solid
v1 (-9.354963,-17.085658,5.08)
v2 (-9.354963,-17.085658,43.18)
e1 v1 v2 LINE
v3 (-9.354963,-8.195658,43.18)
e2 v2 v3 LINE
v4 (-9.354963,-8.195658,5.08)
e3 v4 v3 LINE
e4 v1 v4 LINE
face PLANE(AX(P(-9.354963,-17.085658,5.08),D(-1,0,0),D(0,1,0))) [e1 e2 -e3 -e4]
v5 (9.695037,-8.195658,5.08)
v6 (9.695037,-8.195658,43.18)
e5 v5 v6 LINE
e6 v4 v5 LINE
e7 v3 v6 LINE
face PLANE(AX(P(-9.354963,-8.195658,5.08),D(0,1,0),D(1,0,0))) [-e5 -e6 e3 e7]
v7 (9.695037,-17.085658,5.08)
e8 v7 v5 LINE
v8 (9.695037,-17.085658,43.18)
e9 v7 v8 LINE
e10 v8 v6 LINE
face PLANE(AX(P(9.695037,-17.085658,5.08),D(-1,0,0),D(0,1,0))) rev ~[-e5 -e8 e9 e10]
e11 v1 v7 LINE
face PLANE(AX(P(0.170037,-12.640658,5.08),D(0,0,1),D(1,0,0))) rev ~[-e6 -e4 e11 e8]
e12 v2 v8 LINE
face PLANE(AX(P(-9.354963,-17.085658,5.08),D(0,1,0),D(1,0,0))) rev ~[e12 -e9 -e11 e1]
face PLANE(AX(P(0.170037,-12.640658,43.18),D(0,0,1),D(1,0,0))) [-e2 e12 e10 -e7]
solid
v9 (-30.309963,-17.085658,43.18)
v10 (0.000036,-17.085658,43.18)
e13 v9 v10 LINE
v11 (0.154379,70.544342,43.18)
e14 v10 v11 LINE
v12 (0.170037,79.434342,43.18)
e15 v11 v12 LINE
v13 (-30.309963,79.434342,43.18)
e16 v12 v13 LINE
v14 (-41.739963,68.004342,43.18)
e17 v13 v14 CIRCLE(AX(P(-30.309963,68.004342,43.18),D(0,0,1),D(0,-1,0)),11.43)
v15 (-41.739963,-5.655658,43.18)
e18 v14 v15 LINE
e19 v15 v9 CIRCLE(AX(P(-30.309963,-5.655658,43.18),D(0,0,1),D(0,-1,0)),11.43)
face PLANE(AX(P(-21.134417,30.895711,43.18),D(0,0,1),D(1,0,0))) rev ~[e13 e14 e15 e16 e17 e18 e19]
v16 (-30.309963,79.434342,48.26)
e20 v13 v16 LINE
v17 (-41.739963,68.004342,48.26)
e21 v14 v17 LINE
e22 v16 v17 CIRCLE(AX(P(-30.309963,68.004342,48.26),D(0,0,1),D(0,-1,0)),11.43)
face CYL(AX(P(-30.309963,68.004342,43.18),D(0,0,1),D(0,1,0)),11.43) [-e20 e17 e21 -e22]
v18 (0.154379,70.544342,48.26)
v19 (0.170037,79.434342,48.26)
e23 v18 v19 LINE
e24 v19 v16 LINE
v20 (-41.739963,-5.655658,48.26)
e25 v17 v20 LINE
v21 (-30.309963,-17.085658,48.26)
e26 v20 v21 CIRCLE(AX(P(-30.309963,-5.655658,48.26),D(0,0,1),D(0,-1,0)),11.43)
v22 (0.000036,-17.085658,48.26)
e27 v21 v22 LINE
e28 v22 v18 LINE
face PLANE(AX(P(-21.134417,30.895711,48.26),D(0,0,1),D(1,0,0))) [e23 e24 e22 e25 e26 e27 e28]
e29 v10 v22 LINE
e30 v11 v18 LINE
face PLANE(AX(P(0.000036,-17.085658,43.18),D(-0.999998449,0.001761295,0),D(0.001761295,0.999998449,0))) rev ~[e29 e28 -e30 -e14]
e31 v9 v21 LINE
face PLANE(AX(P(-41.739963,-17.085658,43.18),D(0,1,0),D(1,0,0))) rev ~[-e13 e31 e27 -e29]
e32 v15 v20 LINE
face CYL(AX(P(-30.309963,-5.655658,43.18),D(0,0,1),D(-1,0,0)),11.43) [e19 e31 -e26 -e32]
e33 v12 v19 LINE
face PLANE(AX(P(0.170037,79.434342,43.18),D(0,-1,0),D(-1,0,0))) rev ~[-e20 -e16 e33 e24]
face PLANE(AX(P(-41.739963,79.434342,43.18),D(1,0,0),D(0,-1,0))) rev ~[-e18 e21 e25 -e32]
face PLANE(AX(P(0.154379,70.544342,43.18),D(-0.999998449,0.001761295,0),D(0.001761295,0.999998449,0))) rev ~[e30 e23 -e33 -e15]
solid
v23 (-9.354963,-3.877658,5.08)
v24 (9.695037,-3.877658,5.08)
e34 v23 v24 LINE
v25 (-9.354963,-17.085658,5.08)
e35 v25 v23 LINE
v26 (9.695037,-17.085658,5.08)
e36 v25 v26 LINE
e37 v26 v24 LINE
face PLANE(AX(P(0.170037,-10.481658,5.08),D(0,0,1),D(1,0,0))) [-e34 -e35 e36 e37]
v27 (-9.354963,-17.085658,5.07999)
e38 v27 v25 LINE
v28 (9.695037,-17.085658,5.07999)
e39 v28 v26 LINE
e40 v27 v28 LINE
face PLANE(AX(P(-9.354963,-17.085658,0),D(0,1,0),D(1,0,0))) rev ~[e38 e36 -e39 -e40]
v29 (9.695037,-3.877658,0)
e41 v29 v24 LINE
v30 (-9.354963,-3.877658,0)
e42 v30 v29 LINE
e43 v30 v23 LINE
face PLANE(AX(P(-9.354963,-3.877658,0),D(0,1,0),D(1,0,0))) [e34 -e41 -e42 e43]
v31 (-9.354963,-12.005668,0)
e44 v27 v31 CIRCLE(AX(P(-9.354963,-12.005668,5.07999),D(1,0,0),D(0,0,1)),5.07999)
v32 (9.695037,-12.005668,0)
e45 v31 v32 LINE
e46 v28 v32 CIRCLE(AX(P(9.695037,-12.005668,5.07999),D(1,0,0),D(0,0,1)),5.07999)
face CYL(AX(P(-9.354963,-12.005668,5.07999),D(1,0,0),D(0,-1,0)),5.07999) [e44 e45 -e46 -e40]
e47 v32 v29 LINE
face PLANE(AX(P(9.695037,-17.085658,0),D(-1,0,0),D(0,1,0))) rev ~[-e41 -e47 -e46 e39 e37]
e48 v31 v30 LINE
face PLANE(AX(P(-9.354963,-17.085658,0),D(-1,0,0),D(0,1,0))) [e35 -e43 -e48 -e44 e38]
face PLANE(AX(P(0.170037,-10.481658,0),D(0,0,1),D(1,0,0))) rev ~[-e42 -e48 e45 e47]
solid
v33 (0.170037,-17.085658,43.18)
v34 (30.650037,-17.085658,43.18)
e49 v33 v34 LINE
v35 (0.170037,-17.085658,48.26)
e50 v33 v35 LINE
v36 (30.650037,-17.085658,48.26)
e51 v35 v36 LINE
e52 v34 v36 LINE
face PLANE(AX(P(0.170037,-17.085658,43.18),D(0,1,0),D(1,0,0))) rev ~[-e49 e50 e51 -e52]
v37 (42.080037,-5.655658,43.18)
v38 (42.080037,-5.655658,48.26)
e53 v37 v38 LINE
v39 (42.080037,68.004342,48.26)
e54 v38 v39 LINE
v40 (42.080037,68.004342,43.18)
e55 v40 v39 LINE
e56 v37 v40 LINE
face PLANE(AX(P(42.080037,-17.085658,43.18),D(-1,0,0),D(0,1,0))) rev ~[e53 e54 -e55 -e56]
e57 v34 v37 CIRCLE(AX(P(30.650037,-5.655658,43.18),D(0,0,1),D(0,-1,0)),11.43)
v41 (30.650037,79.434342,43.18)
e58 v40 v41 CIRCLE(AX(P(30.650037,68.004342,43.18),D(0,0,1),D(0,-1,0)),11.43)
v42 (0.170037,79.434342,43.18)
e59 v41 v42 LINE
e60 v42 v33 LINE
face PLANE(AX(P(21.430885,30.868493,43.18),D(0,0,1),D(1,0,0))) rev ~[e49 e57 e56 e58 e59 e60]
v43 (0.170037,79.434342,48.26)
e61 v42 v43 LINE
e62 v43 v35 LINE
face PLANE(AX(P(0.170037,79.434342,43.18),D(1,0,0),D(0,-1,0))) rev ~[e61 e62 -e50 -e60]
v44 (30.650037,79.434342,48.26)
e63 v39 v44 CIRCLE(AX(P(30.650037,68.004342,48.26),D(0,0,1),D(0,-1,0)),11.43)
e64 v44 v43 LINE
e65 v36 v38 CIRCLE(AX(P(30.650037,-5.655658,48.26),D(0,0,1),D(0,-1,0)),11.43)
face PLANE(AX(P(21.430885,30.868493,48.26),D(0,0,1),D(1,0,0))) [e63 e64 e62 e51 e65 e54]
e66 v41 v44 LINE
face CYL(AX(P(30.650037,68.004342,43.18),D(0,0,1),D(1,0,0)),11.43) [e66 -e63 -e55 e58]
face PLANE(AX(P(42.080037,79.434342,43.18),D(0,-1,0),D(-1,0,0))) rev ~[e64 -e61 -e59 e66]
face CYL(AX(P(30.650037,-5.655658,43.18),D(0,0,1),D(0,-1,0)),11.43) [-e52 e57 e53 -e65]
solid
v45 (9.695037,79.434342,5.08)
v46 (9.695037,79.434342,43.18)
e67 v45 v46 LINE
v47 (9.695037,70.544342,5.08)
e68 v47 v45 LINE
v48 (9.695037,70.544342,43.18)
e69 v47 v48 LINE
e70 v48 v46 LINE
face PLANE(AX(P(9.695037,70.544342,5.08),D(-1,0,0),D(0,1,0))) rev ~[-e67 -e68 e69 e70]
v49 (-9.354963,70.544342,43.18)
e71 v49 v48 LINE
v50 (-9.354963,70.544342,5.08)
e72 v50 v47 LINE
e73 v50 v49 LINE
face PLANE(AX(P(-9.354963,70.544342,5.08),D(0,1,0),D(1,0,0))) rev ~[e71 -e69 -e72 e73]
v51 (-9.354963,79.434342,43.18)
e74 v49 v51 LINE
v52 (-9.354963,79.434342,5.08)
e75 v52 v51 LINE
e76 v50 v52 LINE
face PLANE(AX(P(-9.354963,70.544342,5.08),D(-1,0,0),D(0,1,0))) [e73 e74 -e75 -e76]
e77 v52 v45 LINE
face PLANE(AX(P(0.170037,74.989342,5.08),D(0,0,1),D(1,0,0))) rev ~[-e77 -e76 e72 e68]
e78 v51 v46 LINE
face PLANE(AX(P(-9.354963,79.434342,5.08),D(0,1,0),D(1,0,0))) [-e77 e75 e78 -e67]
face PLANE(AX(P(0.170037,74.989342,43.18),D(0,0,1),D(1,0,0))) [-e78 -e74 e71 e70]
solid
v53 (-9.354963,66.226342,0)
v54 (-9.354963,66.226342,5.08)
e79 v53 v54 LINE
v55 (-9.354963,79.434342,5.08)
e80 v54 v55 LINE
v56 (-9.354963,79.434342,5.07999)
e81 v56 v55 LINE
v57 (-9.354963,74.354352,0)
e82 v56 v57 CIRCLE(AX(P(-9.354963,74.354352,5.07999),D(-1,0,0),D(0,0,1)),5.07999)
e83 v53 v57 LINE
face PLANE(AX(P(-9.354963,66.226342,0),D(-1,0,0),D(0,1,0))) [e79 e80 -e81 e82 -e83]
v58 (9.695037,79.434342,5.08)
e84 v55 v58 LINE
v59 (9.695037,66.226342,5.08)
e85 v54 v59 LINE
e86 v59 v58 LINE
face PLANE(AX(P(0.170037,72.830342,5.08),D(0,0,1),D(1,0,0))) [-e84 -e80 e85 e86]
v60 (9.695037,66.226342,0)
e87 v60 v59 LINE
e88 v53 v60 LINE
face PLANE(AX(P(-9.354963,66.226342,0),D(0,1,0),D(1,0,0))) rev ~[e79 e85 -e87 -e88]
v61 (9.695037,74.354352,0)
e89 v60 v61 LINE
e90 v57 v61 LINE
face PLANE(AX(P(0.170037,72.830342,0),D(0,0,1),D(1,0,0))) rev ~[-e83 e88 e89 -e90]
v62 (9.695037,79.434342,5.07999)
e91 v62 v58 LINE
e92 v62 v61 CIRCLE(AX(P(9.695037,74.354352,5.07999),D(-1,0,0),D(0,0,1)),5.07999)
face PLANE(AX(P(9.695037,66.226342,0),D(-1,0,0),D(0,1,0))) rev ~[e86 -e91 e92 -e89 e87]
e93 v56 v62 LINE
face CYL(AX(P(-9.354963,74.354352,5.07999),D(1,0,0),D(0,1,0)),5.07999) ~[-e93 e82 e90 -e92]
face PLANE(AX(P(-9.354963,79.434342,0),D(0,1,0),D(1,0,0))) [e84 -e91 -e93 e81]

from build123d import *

# Parameters (mm, degrees)
F0_W     = 19.05
F0_H     = 13.208
F1_DEPTH = 5.08
F2_W     = 19.05
F2_H     = 8.89
F3_DEPTH = 38.1
F4_W     = 9.525
F4_H     = 8.89
F5_DEPTH = 5.08
F6_R     = 5.07999
F6_2_R   = 5.07999
F7_R     = 11.43
F7_2_R   = 11.43


# Not quite as in the source:
# - a fillet or chamfer is up to 0.001 mm smaller than in the source, because OpenCascade refuses the exact size


with BuildPart() as f1:
    # F0 (on Top) → F1 (new body)
    with BuildSketch(Plane.XY):
        with Locations((0.1700367264, -10.481657926)):
            Rectangle(F0_W, F0_H)
    extrude(amount=F1_DEPTH)

    # F6#2 (radius 5.08 in the source; OpenCascade refuses exactly that, so slightly less here)
    f6_2_edges = [f1.edges().sort_by_distance(p)[0] for p in [
        (0.170037, -17.085658, 0),
    ]]
    fillet(f6_2_edges, radius=F6_2_R)


with BuildPart() as f1b:
    # F0 (on Top) → F1, piece 2 (new body)
    with BuildSketch(Plane.XY):
        with Locations((0.1700367264, 72.830342074)):
            Rectangle(F0_W, F0_H)
    extrude(amount=F1_DEPTH)

    # F6 (radius 5.08 in the source; OpenCascade refuses exactly that, so slightly less here)
    f6_edges = [f1b.edges().sort_by_distance(p)[0] for p in [
        (0.170037, 79.434342, 0),
    ]]
    fillet(f6_edges, radius=F6_R)


with BuildPart() as f3:
    # F2 (on face) → F3 (new body)
    with BuildSketch(Plane.XY.offset(5.08)):
        with Locations((0.1700367264, -12.640657926)):
            Rectangle(F2_W, F2_H)
    extrude(amount=F3_DEPTH)


with BuildPart() as f3b:
    # F2 (on face) → F3, piece 2 (new body)
    with BuildSketch(Plane.XY.offset(5.08)):
        with Locations((0.1700367264, 74.989342074)):
            Rectangle(F2_W, F2_H)
    extrude(amount=F3_DEPTH)


with BuildPart() as f5:
    # F4 (on face) → F5 (new body)
    with BuildSketch(Plane.XY.offset(43.18)):
        Polygon((9.6950367264, 70.544342074), (0.1700367264, 70.544342074), (0.1700367264, -17.085657926), (42.0800367264, -17.085657926), (42.0800367264, 79.434342074), (9.6950367264, 79.434342074), align=None)
        with Locations((4.9325367264, 74.989342074)):
            Rectangle(F4_W, F4_H)
    extrude(amount=F5_DEPTH)

    # F7
    f7_edges = [f5.edges().sort_by_distance(p)[0] for p in [
        (42.080037, 79.434342, 45.72),
        (42.080037, -17.085658, 45.72),
    ]]
    fillet(f7_edges, radius=F7_R)


with BuildPart() as f5b:
    # F4 (on face) → F5, piece 2 (new body)
    with BuildSketch(Plane.XY.offset(43.18)):
        Polygon((3.6226e-05, -17.085657926), (0.1543787856, 70.544342074), (-9.3549632736, 70.544342074), (-9.3549632736, 79.434342074), (-41.7399632736, 79.434342074), (-41.7399632736, -17.085657926), align=None)
        Polygon((0.1543787856, 70.544342074), (0.1700367264, 79.434342074), (-9.3549632736, 79.434342074), (-9.3549632736, 70.544342074), align=None)
    extrude(amount=F5_DEPTH)

    # F7#2
    f7_2_edges = [f5b.edges().sort_by_distance(p)[0] for p in [
        (-41.739963, 79.434342, 45.72),
        (-41.739963, -17.085658, 45.72),
    ]]
    fillet(f7_2_edges, radius=F7_2_R)


solid = Compound([f1.part, f1b.part, f3.part, f3b.part, f5.part, f5b.part])
